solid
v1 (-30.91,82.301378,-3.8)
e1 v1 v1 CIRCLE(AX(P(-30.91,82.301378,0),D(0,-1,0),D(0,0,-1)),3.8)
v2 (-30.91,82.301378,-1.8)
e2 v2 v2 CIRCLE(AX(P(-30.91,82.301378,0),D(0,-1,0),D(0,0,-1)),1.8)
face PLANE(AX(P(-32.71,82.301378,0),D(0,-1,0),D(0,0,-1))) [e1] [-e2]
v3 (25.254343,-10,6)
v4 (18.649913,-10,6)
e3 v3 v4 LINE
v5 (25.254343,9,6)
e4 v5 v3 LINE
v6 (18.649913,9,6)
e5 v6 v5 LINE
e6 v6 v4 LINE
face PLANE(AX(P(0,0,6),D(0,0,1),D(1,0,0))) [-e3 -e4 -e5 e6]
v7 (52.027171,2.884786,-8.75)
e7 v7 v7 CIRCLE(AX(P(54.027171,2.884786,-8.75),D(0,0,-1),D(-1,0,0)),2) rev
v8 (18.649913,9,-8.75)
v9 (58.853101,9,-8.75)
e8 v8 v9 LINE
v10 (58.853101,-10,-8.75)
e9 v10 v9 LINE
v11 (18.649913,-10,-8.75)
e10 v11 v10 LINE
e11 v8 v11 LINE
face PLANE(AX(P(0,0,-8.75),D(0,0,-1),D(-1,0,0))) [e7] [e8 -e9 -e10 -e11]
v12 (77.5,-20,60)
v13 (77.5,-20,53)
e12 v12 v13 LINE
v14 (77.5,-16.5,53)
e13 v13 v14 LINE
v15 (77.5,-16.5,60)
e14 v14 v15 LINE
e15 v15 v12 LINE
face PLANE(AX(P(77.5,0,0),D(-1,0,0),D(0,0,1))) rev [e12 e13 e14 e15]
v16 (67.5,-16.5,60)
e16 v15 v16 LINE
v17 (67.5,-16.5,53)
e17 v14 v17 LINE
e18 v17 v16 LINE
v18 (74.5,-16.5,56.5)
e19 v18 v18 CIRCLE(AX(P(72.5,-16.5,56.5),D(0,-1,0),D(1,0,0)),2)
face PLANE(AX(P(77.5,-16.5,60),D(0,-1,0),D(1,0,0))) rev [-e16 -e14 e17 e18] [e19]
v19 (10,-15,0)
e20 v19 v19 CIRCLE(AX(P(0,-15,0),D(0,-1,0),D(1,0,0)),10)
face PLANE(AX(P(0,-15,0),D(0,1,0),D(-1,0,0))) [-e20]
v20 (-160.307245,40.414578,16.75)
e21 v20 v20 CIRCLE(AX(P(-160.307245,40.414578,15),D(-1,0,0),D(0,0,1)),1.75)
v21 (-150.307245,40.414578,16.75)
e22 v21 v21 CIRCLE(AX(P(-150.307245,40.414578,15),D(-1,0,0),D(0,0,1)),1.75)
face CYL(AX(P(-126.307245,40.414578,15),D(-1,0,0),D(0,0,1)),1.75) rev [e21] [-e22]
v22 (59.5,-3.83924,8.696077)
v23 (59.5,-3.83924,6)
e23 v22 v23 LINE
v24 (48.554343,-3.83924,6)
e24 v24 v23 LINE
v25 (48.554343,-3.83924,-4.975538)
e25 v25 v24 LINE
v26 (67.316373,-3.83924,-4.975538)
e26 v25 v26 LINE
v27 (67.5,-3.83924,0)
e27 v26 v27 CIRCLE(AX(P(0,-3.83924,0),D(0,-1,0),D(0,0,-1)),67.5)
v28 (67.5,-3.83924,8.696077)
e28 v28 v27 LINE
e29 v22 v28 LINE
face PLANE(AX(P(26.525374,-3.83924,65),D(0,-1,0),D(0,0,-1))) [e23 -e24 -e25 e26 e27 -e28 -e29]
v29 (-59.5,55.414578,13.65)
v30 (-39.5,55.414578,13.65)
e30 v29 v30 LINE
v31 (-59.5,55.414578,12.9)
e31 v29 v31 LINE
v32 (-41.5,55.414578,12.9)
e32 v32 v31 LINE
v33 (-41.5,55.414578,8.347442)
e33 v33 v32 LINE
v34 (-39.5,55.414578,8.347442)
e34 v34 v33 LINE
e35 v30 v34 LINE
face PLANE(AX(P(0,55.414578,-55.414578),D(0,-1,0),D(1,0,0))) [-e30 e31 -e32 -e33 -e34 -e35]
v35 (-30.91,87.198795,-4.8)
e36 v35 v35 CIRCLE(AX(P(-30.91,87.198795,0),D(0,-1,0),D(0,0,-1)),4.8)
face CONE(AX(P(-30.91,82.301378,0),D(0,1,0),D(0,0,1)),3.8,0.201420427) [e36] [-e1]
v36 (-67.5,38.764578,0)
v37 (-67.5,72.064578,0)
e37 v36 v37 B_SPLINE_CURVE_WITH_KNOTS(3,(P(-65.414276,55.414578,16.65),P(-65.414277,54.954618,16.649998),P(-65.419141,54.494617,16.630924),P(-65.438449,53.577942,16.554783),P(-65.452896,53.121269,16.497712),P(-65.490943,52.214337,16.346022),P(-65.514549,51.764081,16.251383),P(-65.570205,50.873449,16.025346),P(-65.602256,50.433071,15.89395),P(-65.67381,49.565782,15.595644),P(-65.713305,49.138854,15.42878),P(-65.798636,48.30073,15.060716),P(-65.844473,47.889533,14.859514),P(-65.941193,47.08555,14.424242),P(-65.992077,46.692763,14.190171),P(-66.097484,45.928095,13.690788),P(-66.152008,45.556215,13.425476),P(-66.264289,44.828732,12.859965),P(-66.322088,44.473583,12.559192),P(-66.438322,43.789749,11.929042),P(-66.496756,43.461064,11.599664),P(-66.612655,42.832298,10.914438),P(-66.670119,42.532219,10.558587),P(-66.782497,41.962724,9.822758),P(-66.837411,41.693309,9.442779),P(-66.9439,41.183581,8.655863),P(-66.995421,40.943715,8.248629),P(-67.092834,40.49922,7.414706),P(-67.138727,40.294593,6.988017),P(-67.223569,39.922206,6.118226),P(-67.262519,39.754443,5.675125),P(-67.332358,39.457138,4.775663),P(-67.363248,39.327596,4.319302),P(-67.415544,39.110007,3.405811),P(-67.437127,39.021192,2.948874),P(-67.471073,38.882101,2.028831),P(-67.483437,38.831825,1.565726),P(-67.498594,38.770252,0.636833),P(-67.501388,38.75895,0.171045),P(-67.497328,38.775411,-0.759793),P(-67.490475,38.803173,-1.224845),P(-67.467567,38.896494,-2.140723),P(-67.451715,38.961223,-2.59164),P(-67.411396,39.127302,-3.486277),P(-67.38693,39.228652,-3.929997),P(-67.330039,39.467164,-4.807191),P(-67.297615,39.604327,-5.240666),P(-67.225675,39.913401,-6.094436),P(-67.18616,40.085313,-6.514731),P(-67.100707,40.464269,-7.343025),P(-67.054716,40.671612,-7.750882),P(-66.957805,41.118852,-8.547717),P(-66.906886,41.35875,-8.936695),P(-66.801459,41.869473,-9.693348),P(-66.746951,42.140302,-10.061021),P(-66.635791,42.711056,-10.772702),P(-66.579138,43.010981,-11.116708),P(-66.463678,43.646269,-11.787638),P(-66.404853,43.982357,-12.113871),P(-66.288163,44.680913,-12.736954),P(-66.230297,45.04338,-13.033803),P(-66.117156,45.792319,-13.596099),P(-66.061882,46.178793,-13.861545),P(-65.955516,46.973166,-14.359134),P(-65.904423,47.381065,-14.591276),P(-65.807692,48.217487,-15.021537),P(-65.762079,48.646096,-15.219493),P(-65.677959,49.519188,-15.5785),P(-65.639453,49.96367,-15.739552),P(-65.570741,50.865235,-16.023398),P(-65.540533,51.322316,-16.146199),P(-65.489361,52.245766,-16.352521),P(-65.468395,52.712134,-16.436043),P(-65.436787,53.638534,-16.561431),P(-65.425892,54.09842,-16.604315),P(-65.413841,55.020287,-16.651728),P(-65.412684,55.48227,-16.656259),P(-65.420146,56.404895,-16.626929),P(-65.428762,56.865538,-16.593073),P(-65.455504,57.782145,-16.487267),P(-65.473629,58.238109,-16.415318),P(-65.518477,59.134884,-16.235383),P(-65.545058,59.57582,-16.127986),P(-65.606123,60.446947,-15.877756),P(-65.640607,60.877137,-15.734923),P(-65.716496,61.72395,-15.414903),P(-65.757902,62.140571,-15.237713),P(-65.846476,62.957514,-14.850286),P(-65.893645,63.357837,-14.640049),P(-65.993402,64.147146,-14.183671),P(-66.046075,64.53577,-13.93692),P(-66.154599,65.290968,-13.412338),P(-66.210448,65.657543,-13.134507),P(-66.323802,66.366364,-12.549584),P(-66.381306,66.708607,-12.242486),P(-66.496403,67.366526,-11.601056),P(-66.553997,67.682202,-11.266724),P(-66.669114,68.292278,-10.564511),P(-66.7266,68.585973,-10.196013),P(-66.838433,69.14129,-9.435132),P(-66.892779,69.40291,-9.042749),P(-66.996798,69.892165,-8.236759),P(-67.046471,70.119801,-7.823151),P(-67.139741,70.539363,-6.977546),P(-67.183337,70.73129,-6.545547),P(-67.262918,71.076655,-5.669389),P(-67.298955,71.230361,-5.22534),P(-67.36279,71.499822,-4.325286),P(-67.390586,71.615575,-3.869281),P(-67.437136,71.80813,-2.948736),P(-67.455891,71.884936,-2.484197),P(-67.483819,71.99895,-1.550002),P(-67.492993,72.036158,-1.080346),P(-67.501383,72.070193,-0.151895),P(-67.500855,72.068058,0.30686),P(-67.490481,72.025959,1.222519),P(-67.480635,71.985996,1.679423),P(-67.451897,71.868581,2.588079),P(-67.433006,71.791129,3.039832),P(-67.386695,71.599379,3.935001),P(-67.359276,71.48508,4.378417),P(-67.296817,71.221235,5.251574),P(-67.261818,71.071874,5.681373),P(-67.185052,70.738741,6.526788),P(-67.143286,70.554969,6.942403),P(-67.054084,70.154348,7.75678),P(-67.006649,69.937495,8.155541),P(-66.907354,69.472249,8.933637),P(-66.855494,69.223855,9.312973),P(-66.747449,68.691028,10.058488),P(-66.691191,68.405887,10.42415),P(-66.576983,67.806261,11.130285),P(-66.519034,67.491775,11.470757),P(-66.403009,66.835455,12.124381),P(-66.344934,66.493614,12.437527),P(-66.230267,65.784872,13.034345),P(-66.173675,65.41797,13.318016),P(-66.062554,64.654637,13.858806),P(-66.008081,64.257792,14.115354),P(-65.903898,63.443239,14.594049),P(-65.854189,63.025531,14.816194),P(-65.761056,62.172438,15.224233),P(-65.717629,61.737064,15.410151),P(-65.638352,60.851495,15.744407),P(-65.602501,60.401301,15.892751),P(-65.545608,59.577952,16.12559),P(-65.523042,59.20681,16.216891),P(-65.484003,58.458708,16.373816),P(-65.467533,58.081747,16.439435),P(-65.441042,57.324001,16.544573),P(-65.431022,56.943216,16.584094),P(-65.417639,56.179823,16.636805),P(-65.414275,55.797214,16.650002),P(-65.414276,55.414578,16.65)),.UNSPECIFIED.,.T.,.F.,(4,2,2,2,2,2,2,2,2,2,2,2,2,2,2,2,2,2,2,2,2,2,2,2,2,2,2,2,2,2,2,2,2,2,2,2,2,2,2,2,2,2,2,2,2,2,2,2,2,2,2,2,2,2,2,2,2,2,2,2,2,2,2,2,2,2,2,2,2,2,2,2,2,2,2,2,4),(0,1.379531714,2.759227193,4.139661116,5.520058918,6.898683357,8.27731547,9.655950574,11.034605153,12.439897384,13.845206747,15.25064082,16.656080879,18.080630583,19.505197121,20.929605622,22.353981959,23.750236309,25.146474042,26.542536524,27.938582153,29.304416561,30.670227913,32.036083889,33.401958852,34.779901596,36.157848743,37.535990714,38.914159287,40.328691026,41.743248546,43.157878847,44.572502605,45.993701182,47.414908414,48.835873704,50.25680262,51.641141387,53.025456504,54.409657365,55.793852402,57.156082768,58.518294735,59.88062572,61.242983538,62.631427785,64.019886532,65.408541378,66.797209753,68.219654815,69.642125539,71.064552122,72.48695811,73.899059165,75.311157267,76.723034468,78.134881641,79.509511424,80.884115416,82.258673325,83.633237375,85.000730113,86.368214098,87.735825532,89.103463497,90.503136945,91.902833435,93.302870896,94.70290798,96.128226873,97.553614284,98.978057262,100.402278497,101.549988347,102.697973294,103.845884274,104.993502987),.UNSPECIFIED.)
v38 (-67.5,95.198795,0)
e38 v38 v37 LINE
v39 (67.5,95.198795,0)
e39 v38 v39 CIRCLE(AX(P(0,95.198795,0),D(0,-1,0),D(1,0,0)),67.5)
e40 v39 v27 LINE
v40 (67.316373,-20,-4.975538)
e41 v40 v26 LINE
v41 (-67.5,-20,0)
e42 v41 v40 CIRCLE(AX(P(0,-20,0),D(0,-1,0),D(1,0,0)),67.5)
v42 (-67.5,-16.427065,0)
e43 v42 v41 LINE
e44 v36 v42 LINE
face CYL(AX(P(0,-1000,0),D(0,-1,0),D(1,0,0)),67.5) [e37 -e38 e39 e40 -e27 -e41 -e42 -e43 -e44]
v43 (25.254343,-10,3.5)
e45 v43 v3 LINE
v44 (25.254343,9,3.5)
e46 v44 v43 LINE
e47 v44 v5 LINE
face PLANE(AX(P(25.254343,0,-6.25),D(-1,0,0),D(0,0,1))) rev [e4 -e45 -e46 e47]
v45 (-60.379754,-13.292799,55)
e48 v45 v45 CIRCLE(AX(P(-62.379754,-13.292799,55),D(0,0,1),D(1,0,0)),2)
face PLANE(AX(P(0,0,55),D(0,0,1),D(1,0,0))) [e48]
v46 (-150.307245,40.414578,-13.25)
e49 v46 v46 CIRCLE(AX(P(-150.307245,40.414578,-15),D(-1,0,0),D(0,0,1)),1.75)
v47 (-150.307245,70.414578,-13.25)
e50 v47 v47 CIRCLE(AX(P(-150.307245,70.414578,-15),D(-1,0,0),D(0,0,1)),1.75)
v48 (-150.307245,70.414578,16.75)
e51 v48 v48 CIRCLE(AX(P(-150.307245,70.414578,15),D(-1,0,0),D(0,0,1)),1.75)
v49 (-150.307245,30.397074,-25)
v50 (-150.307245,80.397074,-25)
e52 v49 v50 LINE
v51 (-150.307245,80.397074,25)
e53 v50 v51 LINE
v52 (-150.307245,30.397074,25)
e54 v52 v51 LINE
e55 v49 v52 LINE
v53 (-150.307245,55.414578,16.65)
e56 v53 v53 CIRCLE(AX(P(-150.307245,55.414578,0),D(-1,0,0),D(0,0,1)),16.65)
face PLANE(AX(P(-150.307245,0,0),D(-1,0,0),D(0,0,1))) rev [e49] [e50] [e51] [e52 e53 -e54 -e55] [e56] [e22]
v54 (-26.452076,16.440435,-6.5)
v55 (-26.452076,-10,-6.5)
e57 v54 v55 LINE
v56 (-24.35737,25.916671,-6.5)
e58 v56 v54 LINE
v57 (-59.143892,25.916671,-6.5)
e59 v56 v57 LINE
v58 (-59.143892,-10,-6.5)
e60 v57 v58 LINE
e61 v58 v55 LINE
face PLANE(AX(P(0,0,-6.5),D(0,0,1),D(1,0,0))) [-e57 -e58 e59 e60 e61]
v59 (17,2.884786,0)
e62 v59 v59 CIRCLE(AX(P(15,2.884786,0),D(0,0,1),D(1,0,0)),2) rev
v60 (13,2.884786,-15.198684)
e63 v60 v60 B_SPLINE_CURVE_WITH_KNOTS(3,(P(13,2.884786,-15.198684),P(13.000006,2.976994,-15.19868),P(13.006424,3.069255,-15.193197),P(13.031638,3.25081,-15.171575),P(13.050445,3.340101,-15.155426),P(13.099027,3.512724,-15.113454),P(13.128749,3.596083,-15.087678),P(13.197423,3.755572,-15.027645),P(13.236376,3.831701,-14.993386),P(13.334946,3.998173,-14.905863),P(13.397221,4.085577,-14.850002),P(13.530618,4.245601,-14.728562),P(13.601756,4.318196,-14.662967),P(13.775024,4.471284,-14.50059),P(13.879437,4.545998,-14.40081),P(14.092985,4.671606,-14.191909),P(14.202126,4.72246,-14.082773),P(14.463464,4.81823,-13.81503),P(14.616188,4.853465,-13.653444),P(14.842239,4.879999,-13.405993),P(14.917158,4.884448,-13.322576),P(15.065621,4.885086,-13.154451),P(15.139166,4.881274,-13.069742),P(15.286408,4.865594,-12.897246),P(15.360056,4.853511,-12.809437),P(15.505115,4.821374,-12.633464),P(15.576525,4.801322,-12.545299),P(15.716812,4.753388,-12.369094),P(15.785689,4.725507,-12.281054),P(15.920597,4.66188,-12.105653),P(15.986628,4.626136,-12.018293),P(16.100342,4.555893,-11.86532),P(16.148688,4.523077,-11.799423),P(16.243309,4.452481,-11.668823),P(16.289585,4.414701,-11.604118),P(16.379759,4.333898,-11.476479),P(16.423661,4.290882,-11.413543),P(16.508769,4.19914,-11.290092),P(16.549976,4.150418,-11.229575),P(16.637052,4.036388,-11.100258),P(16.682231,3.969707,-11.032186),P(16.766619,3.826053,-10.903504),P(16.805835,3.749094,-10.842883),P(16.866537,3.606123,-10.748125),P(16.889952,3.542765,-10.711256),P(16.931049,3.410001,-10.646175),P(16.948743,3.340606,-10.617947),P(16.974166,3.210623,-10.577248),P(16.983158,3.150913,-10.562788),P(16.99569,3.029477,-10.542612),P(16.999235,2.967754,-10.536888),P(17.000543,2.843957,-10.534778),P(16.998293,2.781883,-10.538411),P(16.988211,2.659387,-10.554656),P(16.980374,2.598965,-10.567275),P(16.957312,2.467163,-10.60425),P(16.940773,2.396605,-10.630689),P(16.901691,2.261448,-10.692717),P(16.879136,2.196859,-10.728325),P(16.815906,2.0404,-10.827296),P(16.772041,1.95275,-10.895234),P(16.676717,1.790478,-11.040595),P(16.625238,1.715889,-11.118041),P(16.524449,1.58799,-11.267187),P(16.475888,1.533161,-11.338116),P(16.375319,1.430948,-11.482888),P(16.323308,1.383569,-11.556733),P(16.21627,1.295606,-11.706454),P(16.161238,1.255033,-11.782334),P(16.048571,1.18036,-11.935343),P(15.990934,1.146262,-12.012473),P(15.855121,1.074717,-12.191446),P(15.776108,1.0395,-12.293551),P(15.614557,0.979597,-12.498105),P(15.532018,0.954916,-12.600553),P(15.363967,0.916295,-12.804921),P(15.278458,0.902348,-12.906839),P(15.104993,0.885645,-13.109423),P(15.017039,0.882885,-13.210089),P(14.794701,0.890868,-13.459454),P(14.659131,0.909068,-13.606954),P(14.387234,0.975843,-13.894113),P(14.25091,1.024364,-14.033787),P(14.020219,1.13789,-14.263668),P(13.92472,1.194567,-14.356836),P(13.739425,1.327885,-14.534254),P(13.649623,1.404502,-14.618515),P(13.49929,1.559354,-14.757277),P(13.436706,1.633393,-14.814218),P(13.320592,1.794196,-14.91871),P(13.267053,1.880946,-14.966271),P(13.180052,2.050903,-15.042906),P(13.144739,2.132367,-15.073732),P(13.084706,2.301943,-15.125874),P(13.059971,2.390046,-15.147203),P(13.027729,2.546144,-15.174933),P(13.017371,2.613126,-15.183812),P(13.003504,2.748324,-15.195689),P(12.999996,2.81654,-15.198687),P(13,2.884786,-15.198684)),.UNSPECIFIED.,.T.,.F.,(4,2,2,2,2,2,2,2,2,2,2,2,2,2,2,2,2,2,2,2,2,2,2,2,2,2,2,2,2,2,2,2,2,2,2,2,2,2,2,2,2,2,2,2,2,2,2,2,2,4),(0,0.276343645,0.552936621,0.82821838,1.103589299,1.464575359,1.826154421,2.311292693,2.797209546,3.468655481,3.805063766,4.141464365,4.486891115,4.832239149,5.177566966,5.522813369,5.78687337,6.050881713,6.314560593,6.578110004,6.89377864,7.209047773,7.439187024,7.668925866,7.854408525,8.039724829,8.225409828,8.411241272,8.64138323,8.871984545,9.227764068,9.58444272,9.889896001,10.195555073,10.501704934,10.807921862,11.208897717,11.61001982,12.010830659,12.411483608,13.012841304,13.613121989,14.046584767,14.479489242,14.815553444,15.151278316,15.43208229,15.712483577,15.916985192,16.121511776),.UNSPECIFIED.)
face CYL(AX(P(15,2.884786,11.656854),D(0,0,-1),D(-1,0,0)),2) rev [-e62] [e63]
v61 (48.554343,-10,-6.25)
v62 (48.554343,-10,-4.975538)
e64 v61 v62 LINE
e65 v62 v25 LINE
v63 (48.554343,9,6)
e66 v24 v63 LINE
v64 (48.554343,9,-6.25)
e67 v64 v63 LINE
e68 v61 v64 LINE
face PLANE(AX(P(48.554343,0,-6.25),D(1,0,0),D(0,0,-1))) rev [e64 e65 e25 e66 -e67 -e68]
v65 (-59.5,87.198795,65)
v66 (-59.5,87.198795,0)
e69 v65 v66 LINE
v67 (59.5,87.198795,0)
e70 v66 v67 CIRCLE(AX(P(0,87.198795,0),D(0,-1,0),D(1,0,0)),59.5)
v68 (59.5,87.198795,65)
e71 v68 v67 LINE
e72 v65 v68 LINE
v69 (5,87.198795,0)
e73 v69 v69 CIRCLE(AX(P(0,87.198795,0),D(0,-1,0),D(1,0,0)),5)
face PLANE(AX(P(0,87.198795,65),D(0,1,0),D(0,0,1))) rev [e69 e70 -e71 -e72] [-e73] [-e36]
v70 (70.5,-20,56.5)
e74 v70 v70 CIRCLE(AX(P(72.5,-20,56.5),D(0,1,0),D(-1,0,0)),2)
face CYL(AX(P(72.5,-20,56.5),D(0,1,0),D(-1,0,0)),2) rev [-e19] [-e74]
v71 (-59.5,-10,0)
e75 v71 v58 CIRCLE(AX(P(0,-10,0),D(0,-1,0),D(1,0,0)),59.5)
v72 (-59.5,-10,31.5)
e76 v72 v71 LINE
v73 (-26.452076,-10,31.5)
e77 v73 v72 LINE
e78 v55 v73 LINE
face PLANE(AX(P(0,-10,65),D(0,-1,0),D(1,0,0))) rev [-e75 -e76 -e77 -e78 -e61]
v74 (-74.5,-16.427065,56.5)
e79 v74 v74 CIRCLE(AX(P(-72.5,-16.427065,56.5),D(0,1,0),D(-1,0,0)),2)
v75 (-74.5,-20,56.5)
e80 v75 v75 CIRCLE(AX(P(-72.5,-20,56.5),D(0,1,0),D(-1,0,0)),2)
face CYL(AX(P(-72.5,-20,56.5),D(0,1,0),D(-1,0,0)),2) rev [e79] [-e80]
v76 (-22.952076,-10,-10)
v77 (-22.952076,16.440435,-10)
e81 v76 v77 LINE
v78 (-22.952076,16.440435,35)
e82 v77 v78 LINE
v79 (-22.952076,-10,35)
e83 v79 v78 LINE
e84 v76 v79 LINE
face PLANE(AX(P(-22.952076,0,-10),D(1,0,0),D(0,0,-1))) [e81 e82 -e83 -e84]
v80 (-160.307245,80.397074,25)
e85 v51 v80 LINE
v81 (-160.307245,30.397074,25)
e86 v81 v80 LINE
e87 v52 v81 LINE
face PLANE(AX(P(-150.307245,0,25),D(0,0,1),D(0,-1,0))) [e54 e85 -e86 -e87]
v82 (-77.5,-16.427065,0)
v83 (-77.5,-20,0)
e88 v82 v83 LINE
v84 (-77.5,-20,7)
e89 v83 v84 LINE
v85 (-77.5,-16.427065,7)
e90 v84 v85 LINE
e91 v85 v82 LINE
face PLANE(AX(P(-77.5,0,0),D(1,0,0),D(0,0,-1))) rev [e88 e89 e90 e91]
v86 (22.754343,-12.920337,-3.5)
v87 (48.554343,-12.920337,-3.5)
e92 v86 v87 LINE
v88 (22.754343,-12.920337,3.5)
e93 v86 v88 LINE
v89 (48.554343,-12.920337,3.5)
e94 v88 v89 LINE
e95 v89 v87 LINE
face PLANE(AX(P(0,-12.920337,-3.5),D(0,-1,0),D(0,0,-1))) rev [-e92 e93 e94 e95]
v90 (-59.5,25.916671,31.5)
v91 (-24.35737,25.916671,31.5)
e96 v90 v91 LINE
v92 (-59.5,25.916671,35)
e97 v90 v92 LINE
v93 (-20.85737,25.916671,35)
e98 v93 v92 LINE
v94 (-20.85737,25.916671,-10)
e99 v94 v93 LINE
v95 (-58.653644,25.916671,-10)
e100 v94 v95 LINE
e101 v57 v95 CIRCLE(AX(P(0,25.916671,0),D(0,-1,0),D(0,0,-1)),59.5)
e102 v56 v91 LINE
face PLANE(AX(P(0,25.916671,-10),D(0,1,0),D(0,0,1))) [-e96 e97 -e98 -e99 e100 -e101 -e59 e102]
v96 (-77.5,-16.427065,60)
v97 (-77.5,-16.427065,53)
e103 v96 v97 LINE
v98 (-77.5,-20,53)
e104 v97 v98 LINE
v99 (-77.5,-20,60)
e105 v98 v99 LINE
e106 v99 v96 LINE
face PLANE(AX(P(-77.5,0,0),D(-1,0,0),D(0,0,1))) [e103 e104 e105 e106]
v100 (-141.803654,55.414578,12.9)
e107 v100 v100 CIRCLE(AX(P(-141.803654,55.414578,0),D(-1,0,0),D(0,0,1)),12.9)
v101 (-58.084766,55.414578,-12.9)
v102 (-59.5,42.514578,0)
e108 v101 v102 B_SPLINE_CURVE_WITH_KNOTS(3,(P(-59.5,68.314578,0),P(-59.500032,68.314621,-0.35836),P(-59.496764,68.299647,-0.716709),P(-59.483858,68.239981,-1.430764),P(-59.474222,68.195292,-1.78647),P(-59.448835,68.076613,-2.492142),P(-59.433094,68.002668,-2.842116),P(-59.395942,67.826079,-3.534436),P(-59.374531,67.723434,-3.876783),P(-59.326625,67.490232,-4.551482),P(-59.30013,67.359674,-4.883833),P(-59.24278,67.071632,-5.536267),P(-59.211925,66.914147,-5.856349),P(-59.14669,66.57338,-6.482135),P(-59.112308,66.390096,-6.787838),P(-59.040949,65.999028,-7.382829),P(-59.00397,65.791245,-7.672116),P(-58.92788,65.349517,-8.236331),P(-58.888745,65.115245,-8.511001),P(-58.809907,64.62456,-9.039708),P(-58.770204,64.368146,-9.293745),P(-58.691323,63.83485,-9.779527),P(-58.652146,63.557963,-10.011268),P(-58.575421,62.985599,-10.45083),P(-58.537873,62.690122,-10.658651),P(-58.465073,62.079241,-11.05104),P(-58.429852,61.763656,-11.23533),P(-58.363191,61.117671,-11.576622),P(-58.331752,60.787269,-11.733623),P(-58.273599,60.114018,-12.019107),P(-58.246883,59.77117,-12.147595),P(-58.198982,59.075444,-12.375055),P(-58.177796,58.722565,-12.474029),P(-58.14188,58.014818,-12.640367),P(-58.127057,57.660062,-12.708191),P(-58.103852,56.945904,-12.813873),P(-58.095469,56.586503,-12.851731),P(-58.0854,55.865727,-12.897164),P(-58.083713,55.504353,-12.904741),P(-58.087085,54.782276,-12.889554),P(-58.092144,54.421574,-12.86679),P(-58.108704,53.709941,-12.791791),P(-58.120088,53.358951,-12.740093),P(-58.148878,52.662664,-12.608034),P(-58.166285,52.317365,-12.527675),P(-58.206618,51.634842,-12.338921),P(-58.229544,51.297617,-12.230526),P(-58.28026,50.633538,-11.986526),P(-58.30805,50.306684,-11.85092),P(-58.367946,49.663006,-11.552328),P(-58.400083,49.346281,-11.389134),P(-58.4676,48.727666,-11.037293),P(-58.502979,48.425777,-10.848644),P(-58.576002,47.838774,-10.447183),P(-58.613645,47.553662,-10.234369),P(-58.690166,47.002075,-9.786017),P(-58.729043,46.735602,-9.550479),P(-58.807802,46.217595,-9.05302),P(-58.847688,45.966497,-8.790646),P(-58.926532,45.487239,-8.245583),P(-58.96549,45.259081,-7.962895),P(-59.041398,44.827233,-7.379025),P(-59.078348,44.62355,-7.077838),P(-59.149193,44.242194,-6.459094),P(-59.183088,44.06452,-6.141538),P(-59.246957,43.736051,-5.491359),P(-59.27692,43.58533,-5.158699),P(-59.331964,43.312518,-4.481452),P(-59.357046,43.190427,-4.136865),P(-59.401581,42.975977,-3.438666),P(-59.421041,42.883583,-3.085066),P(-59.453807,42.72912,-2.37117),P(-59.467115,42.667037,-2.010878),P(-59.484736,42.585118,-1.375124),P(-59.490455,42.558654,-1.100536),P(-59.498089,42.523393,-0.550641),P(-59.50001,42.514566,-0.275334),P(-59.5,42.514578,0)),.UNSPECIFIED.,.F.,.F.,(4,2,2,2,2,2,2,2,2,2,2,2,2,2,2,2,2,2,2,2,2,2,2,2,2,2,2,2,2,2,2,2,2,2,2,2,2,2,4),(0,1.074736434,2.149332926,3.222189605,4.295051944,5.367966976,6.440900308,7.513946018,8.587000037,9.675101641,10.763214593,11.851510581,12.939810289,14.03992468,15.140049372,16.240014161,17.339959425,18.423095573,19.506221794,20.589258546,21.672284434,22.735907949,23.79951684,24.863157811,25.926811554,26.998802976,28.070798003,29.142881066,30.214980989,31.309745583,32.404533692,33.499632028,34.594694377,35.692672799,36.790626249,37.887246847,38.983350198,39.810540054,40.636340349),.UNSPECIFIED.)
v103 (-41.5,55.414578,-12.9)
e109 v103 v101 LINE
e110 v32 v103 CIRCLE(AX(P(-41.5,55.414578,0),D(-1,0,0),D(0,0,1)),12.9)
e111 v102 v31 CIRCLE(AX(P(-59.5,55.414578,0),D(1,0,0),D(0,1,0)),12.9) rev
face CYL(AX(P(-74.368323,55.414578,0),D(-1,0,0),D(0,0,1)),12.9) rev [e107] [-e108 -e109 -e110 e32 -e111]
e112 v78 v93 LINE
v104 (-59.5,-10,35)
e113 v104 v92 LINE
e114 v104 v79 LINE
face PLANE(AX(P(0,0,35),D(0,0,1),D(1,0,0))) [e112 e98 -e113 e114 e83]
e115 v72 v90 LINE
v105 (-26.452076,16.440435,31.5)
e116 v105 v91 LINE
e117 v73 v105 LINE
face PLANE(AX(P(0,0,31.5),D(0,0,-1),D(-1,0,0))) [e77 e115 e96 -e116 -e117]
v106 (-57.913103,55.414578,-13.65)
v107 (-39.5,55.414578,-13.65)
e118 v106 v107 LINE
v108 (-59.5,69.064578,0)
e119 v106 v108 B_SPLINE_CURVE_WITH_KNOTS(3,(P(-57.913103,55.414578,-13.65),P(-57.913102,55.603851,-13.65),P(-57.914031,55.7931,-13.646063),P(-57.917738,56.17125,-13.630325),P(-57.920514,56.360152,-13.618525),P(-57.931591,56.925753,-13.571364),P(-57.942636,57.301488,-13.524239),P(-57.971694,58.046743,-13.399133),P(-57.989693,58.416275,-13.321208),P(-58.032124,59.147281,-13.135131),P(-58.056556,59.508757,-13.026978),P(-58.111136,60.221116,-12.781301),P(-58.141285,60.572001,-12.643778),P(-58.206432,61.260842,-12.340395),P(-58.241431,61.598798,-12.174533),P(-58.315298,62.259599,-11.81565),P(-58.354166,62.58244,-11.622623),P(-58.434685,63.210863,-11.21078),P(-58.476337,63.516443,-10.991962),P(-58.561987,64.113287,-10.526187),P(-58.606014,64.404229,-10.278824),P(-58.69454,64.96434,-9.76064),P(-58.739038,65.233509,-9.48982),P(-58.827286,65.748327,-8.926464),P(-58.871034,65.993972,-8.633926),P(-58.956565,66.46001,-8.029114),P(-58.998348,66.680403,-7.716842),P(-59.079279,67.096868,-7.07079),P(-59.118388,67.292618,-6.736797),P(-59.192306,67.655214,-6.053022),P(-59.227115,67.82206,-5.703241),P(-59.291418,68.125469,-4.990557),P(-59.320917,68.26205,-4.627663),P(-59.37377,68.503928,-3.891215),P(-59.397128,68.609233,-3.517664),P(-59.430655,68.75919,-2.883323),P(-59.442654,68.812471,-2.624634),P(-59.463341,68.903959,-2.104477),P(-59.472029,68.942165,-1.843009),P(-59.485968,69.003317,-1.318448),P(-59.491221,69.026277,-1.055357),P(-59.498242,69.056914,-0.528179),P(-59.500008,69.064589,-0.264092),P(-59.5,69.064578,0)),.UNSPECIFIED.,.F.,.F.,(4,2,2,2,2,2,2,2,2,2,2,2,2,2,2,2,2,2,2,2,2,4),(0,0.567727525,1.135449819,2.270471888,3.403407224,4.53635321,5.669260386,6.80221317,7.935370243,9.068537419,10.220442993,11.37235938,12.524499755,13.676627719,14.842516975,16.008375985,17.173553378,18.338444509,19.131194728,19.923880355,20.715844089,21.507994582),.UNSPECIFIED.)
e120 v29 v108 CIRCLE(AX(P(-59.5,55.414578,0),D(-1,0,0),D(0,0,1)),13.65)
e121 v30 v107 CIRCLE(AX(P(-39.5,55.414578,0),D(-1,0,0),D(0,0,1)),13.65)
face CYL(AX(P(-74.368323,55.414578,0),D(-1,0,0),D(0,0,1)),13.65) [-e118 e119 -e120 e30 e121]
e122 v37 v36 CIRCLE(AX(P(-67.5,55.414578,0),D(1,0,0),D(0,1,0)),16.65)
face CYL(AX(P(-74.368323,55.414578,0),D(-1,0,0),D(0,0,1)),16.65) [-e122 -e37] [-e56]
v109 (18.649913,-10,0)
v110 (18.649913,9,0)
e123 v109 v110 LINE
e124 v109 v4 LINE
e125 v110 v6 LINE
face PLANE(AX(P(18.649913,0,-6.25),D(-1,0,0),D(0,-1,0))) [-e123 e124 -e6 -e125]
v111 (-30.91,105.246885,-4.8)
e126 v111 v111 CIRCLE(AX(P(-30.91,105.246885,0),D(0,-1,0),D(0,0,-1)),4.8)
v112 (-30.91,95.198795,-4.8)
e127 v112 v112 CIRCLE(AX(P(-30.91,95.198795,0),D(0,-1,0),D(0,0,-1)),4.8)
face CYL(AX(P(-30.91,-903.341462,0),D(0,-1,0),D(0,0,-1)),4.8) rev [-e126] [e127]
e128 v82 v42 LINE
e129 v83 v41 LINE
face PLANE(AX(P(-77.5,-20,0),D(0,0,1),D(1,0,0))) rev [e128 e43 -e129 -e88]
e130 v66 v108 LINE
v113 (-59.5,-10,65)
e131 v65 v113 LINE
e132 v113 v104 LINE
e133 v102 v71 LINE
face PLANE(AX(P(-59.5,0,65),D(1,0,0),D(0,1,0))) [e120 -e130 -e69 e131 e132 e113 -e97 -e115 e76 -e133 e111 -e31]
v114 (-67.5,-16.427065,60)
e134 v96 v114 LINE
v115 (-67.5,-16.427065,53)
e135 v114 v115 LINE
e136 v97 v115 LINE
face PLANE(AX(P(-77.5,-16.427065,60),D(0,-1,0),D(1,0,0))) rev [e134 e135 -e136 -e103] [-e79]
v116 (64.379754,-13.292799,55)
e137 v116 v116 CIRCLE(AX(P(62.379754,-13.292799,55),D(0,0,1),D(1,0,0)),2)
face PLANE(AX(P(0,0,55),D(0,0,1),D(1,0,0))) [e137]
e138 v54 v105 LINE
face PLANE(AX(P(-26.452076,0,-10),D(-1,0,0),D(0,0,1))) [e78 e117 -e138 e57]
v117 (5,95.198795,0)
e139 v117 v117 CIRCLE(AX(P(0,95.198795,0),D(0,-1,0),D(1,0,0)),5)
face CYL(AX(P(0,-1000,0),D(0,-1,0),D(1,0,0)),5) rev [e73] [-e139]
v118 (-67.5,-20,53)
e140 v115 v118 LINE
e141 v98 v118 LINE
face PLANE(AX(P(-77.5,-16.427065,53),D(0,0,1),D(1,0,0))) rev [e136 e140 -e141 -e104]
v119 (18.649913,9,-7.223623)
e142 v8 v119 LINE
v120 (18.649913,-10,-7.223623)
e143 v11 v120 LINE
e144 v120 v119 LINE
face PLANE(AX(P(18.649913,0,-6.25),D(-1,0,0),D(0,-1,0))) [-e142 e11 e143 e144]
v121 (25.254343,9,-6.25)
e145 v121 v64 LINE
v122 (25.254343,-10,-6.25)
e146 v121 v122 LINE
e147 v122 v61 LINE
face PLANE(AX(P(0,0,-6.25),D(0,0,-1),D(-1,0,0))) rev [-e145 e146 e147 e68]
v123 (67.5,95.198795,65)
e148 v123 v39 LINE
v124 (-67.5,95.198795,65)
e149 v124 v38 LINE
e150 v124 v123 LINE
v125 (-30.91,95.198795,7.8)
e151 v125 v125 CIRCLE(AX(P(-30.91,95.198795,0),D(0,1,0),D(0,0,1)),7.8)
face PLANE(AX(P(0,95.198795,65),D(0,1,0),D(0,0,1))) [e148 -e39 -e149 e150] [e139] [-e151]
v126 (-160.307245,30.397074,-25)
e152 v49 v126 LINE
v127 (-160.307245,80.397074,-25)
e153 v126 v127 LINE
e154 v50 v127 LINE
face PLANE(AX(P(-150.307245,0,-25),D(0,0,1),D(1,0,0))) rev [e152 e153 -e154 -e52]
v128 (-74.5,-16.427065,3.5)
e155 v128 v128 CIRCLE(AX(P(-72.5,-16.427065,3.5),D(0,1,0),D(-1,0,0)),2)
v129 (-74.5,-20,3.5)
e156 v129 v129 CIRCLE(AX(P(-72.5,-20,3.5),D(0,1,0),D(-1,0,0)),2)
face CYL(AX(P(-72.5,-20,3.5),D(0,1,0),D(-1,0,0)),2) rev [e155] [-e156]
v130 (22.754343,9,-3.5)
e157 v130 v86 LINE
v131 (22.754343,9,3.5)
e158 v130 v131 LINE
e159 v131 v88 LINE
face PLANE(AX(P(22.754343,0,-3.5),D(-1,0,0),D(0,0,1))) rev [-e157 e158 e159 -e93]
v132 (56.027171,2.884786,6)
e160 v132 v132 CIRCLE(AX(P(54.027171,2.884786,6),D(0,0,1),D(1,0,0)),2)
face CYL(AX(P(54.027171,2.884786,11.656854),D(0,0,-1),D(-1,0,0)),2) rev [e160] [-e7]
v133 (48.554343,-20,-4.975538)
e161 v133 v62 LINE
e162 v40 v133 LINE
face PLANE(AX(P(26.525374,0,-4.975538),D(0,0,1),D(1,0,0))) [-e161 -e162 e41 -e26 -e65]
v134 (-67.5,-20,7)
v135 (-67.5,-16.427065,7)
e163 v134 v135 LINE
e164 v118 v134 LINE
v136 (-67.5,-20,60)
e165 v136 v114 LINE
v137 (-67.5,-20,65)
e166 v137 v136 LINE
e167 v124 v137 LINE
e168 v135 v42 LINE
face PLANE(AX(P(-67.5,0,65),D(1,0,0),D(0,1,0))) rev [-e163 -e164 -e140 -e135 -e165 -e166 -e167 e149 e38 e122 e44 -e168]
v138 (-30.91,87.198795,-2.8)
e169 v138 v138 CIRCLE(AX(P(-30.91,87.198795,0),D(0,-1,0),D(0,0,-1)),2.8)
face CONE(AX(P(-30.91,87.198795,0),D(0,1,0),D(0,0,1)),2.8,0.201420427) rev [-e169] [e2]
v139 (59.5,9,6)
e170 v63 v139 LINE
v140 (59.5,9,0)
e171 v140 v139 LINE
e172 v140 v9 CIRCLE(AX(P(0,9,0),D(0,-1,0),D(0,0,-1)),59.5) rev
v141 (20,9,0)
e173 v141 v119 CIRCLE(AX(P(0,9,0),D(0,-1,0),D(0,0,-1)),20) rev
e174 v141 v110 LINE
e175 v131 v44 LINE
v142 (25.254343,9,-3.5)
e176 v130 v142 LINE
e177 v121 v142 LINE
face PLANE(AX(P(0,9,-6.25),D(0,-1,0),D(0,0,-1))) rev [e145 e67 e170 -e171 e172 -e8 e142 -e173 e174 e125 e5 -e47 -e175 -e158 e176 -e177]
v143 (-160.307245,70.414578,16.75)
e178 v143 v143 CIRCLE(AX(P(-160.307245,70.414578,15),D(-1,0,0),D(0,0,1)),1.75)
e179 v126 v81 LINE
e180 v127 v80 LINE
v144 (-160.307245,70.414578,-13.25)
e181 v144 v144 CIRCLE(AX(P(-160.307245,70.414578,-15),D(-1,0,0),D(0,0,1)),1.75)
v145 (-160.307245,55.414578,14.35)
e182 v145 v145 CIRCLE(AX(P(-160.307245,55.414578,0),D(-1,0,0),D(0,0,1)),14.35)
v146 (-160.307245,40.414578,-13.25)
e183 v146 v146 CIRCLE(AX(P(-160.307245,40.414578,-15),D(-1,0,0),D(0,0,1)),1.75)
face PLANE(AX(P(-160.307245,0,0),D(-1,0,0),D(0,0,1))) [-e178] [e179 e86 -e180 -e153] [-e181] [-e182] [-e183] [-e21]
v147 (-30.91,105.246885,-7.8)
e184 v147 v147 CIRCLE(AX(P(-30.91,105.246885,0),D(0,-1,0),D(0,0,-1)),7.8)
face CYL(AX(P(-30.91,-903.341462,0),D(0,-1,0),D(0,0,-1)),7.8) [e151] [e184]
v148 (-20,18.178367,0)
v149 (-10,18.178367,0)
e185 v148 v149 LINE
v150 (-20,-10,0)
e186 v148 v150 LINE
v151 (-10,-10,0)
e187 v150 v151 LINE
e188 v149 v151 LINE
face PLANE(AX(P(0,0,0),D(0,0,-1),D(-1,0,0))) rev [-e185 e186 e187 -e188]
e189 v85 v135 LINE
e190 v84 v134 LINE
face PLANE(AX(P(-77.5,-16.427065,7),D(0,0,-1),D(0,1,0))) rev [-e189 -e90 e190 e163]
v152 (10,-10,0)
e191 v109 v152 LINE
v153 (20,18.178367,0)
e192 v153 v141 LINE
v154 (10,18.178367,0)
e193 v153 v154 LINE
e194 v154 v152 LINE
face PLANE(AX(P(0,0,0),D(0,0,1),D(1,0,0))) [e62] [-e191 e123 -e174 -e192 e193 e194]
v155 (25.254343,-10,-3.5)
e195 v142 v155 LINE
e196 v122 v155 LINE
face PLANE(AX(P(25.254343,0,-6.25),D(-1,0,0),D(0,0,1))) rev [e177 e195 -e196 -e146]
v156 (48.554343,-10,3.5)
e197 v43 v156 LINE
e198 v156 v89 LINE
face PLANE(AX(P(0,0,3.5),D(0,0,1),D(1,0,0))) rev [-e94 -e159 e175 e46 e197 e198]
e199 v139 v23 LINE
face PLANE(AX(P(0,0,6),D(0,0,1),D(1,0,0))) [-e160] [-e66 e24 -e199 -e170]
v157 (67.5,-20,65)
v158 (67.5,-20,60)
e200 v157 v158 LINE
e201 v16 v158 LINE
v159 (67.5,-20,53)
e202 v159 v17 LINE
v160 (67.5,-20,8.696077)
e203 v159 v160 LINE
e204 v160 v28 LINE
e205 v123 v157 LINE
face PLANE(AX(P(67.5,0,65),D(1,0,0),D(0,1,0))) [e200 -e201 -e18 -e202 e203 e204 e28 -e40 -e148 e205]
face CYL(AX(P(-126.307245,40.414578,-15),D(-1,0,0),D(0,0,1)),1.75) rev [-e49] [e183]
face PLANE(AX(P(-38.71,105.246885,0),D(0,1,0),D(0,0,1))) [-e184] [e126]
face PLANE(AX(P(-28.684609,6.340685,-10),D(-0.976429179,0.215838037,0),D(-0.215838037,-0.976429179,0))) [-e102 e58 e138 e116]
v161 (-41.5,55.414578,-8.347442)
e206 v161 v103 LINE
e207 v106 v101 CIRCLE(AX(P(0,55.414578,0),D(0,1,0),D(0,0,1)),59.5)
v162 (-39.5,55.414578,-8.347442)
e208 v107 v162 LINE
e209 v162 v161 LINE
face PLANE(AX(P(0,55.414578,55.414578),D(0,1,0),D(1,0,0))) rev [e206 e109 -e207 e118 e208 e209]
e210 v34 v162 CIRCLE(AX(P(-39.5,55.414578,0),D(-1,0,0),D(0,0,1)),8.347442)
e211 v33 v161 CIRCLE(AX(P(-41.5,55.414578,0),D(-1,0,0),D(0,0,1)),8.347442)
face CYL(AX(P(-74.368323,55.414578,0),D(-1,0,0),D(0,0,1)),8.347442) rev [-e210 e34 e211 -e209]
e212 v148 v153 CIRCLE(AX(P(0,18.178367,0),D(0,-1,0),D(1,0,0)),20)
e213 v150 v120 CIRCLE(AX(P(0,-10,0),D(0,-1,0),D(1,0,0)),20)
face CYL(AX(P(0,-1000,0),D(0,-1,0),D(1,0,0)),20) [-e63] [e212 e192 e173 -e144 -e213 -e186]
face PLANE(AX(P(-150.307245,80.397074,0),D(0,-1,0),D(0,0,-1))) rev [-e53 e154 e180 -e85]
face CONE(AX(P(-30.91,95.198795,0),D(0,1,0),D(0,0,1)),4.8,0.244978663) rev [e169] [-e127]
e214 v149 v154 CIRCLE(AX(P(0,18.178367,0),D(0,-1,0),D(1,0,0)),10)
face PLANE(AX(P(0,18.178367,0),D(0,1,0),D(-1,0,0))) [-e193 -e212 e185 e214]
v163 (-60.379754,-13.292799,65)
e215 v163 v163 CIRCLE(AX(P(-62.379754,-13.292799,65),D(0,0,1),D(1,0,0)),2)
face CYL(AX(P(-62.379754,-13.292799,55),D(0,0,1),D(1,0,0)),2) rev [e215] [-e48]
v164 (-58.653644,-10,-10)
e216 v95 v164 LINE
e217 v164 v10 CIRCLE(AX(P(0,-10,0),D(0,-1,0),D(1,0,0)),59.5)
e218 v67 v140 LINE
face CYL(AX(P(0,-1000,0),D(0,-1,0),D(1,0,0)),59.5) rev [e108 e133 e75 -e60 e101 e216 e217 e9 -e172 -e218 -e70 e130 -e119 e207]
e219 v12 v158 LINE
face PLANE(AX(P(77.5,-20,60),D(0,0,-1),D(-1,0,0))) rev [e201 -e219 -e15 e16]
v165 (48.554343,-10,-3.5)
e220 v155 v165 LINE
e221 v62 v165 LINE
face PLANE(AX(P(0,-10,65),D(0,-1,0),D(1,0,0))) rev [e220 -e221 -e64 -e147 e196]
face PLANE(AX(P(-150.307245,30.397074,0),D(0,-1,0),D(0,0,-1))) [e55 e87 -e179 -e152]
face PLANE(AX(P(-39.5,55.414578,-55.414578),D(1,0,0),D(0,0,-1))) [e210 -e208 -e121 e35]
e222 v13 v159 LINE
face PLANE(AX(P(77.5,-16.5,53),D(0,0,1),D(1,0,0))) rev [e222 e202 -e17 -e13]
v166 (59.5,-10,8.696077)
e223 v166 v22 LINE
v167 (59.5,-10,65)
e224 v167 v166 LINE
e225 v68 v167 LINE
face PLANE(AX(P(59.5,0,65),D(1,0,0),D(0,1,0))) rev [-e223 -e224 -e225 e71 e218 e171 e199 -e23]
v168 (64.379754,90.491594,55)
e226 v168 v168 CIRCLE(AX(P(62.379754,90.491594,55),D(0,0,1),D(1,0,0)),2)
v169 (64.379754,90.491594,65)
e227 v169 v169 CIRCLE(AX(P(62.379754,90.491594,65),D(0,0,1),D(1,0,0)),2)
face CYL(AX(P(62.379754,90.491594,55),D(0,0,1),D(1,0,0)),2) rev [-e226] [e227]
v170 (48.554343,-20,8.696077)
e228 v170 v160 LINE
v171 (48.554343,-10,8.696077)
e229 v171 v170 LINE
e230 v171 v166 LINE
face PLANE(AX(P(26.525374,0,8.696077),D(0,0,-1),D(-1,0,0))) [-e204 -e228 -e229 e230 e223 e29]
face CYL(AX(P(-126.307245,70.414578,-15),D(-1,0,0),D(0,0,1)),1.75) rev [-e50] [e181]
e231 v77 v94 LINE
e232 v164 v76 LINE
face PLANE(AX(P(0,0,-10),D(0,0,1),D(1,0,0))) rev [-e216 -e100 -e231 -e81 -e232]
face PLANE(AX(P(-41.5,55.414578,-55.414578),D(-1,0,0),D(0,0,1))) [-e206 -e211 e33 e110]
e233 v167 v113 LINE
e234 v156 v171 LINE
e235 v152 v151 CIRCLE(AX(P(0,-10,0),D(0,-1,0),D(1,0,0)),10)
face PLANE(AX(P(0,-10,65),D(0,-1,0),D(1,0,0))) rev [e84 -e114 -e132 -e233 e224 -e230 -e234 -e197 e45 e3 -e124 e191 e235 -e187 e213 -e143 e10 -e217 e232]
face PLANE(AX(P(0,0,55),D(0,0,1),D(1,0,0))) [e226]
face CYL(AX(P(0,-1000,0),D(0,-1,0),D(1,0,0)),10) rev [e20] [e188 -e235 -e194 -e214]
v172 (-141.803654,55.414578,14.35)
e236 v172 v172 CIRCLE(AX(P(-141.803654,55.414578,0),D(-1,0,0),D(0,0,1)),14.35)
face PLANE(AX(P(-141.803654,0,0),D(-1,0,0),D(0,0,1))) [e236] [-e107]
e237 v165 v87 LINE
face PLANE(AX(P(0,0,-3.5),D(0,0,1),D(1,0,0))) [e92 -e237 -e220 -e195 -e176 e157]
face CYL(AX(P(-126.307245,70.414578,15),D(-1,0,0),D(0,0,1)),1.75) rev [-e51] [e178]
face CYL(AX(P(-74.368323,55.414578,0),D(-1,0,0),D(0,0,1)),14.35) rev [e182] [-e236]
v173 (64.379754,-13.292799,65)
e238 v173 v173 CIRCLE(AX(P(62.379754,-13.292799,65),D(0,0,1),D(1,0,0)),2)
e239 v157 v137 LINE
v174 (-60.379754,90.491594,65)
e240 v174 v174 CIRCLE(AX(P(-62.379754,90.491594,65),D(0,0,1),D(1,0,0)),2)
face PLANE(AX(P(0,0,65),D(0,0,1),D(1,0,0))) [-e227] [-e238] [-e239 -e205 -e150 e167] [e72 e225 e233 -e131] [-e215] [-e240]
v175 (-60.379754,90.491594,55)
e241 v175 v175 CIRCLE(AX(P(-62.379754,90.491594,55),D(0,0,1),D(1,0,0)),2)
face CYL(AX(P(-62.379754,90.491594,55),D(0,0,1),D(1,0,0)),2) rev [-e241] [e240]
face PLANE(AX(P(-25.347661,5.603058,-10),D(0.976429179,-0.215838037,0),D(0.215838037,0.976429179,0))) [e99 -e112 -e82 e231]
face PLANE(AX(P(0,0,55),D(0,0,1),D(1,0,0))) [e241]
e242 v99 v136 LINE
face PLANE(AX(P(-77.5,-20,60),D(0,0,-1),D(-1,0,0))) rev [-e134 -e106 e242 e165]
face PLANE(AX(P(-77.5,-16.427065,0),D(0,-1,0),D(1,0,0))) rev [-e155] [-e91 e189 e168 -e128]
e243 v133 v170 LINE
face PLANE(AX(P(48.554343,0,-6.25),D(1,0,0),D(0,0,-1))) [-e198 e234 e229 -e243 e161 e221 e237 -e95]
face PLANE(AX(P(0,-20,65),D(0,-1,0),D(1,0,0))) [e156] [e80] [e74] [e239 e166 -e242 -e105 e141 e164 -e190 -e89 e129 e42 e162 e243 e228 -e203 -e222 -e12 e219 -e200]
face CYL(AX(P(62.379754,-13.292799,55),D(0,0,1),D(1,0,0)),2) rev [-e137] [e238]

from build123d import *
from build123d.topology import SkipClean

# Parameters (mm, degrees)
BOSS_EXTRUDE3_DEPTH                   = 65
BOSS_EXTRUDE1_DEPTH                   = 6
BOSS_EXTRUDE1_DEPTH_BACK              = 6.25
SKETCH1_5_W                           = 6.6044296
SKETCH1_5_H                           = 19
SKETCH1_5_W_2                         = 10.945657065
BOSS_EXTRUDE2_START                   = -8.75
BOSS_EXTRUDE2_OUTLINE_W               = 40.850086665
BOSS_EXTRUDE2_OUTLINE_H               = 19
BOSS_EXTRUDE2_DEPTH                   = 2.5
REVOLVE2_ANGLE                        = 180
SKETCH1_12_W                          = 10
SKETCH1_12_H                          = 5
SKETCH1_11_W                          = 5
SKETCH1_11_H                          = 8
REVOLVE4_START                        = -10
REVOLVE4_DEPTH                        = 28.178366994
SKETCH3_6_W                           = 74.303654242
SKETCH3_6_H                           = 3.75
REVOLVE7_ANGLE                        = 180
SKETCH3_8_W                           = 18.503590934
SKETCH3_8_H                           = 2.3
SKETCH5_W                             = 50
SKETCH5_H                             = 50
SKETCH5_R                             = 16.65
BOSS_EXTRUDE4_DEPTH                   = 10
SKETCH6_R                             = 1.75
CAMERA_HEAT_SET_INSERT_CUT_DEPTH      = 34
SERVO_START                           = 67.5
SKETCH9_W                             = 13.671614749
SKETCH9_H                             = 17.273170498
SERVO_WIRE_CUT_DEPTH                  = 18.945657065
CUT_EXTRUDE2_DEPTH                    = 3.5
SKETCH10_4_W                          = 3
SKETCH10_4_H                          = 10.048090033
BOSS_EXTRUDE5_DEPTH                   = 35
BOSS_EXTRUDE5_DEPTH_BACK              = 10
BOSS_EXTRUDE6_START                   = 31.5
SKETCH11_3_W                          = 3.5
SKETCH11_3_H                          = 26.440435159
SKETCH11_3_W_2                        = 33.047923562
BOSS_EXTRUDE6_DEPTH                   = 3.5
BOSS_EXTRUDE7_START                   = -10
SKETCH11_5_W                          = 33.047923562
SKETCH11_5_H                          = 26.440435159
BOSS_EXTRUDE7_DEPTH                   = 3.5
SKETCH12_R                            = 2
HEAT_SET_INSERT_CUT_DEPTH             = 17
HEAT_SET_INSERT_CUT_DIRECTION_2_REACH = 205.302
SKETCH14_R                            = 2
PANEL_HEAT_SET_INSERT_CUT_DEPTH       = 10
SKETCH16_W                            = 7
SKETCH16_H                            = 3.57293467
BOSS_EXTRUDE10_DEPTH                  = 10
SKETCH18_W                            = 7
SKETCH18_H                            = 3.5
BOSS_EXTRUDE11_DEPTH                  = 10
SKETCH19_R                            = 2
CUT_EXTRUDE1_DEPTH                    = 213.271554907


# Read off the part's stored shape, not the designer's step: Boss-Extrude2, Revolve4
with BuildPart() as part:
    # Sketch4 → Boss-Extrude3 (new body)
    with BuildSketch(Plane.XY):
        Polygon((59.5, -10), (0, -10), (0, -15), (0, -20), (67.5, -20), (67.5, 95.198794821), (0, 95.198794821), (0, 87.198794821), (59.5, 87.198794821), align=None)
    boss_extrude3 = extrude(amount=BOSS_EXTRUDE3_DEPTH)

    # Mirror1: Boss-Extrude3 across plane
    add(boss_extrude3.mirror(Plane(origin=(0, 0, 0), x_dir=(0, 0, 1), z_dir=(1, 0, 0))))

    # Sketch1<5> → Boss-Extrude1 (add, two sides: drawn at the far end of the back side and taken through both)
    with BuildSketch(Plane.XY.offset(-BOSS_EXTRUDE1_DEPTH_BACK)):
        with Locations((21.952128135, -0.5)):
            Rectangle(SKETCH1_5_W, SKETCH1_5_H)
        with Locations((54.027171468, -0.5)):
            Rectangle(SKETCH1_5_W_2, SKETCH1_5_H)
    extrude(amount=BOSS_EXTRUDE1_DEPTH + BOSS_EXTRUDE1_DEPTH_BACK)

    # Boss-Extrude2 outline → Boss-Extrude2 (add)
    with BuildSketch(Plane.XY.offset(BOSS_EXTRUDE2_START)):
        with Locations((39.074956668, -0.5)):
            Rectangle(BOSS_EXTRUDE2_OUTLINE_W, BOSS_EXTRUDE2_OUTLINE_H)
    extrude(amount=BOSS_EXTRUDE2_DEPTH)

    # Sketch1 → Revolve2 (revolve)
    with BuildSketch(Plane.XY):
        Polygon((0, -15), (0, -20), (67.5, -20), (67.5, 95.198794821), (5, 95.198794821), (5, 87.198794821), (59.5, 87.198794821), (59.5, -10), (0, -10), align=None)
    revolve(axis=Axis((0, -1000, 0), (0, 1, 0)), revolution_arc=REVOLVE2_ANGLE)

    # Sketch1<12> → Cut-Revolve4 (revolve, cut)
    with BuildSketch(Plane.XY):
        with Locations((5, -12.5)):
            Rectangle(SKETCH1_12_W, SKETCH1_12_H)
    revolve(axis=Axis((0, -1000, 0), (0, 1, 0)), mode=Mode.SUBTRACT)

    # Sketch1<11> → Cut-Revolve2 (revolve, cut)
    with SkipClean():  # the faces are left unmerged after this step: merging them gives an invalid solid
        with BuildSketch(Plane.XY):
            with Locations((2.5, 91.198794821)):
                Rectangle(SKETCH1_11_W, SKETCH1_11_H)
        revolve(axis=Axis((0, -1000, 0), (0, 1, 0)), mode=Mode.SUBTRACT)

    # Revolve4 outline → Revolve4 (add)
    with SkipClean():  # the faces are left unmerged after this step: merging them gives an invalid solid
        with BuildSketch(Plane(origin=(0, 0, 0), x_dir=(1, 0, 0), z_dir=(0, 1, 0)).offset(REVOLVE4_START)):
            with BuildLine():
                ThreePointArc((-10, 0), (0, 10), (10, 0))
                Line((10, 0), (20, 0))
                ThreePointArc((20, 0), (0, 20), (-20, 0))
                Line((-20, 0), (-10, 0))
            make_face()
        extrude(amount=REVOLVE4_DEPTH)

    # Sketch3 → Cut-Revolve1 (revolve, cut)
    with SkipClean():  # the faces are left unmerged after this step: merging them gives an invalid solid
        with BuildSketch(Plane.XY):
            Polygon((-49.874960718, 68.314577929), (-59.5, 68.314577929), (-67.5, 68.314577929), (-83.969434571, 68.314577929), (-83.969434571, 55.414577929), (-74.368322949, 55.414577929), (-58.243601064, 55.414577929), (-49.874960718, 55.414577929), align=None)
        revolve(axis=Axis((-74.368322949, 55.414577929, 0), (1, 0, 0)), mode=Mode.SUBTRACT)

    # Sketch3<6> → Revolve6 (revolve)
    with SkipClean():  # the faces are left unmerged after this step: merging them gives an invalid solid
        with BuildSketch(Plane.XY, mode=Mode.PRIVATE) as revolve6_sk:
            with Locations((-104.651827121, 70.189577929)):
                Rectangle(SKETCH3_6_W, SKETCH3_6_H)
            Polygon((-59.5, 69.064577929), (-59.5, 68.314577929), (-67.5, 68.314577929), (-67.5, 72.064577929), (-59.5, 72.064577929), align=None)
        revolve(revolve6_sk.sketch.rotate(Axis((-74.368322949, 55.414577929, 0), (1, 0, 0)), 90), axis=Axis((-74.368322949, 55.414577929, 0), (1, 0, 0)))

    # Sketch3<7> → Revolve7 (revolve, symmetric)
    with SkipClean():  # the faces are left unmerged after this step: merging them gives an invalid solid
        with BuildSketch(Plane.XY) as revolve7_sk:
            Polygon((-39.5, 69.064577929), (-59.5, 69.064577929), (-59.5, 68.314577929), (-49.874960718, 68.314577929), (-41.5, 68.314577929), (-41.5, 63.762019978), (-39.5, 63.762019978), align=None)
        revolve(axis=Axis((-74.368322949, 55.414577929, 0), (1, 0, 0)), revolution_arc=REVOLVE7_ANGLE / 2)
        revolve(revolve7_sk.sketch, axis=Axis((-74.368322949, 55.414577929, 0), (-1, 0, 0)), revolution_arc=REVOLVE7_ANGLE / 2)

    # Sketch3<8> → Revolve8 (revolve)
    with SkipClean():  # the faces are left unmerged after this step: merging them gives an invalid solid
        with BuildSketch(Plane.XY, mode=Mode.PRIVATE) as revolve8_sk:
            with Locations((-151.055449709, 70.914577929)):
                Rectangle(SKETCH3_8_W, SKETCH3_8_H)
        revolve(revolve8_sk.sketch.rotate(Axis((-74.368322949, 55.414577929, 0), (1, 0, 0)), 90), axis=Axis((-74.368322949, 55.414577929, 0), (1, 0, 0)))

    # Sketch5 → Boss-Extrude4 (add)
    with SkipClean():  # the faces are left unmerged after this step: merging them gives an invalid solid
        with BuildSketch(Plane.ZY.offset(160.307245176)):
            with Locations((0, 55.39707409)):
                Rectangle(SKETCH5_W, SKETCH5_H)
            with Locations((0, 55.414577929)):
                Circle(SKETCH5_R, mode=Mode.SUBTRACT)
        extrude(amount=-BOSS_EXTRUDE4_DEPTH)

    # Sketch6 → Camera Heat Set Insert Cut (cut)
    with SkipClean():  # the faces are left unmerged after this step: merging them gives an invalid solid
        with BuildSketch(Plane.ZY.offset(160.307245176)):
            with Locations((15, 70.414577929)):
                Circle(SKETCH6_R)
            with Locations((-15, 70.414577929)):
                Circle(SKETCH6_R)
            with Locations((-15, 40.414577929)):
                Circle(SKETCH6_R)
            with Locations((15, 40.414577929)):
                Circle(SKETCH6_R)
        extrude(amount=-CAMERA_HEAT_SET_INSERT_CUT_DEPTH, mode=Mode.SUBTRACT)

    # Sketch9 → Servo Wire Cut (cut)
    with BuildSketch(Plane(origin=(0, 0, 0), x_dir=(0, 0, -1), z_dir=(1, 0, 0)).offset(SERVO_START)):
        with Locations((-1.860269854, -12.475825554)):
            Rectangle(SKETCH9_W, SKETCH9_H)
    extrude(amount=-SERVO_WIRE_CUT_DEPTH, mode=Mode.SUBTRACT)

    # Sketch1<13> → Cut-Extrude2 (cut, symmetric)
    with BuildSketch(Plane.XY):
        Polygon((22.754342935, -12.920336749), (59.5, -12.920336749), (59.5, -10), (25.254342935, -10), (25.254342935, 9), (22.754342935, 9), align=None)
    extrude(amount=CUT_EXTRUDE2_DEPTH, both=True, mode=Mode.SUBTRACT)

    # Sketch10 → Cut-Revolve3 (revolve, cut)
    with BuildSketch(Plane(origin=(0, 0, 0), x_dir=(-1, 0, 0), z_dir=(0, 0, -1)), mode=Mode.PRIVATE) as cut_revolve3_sk:
        Polygon((30.91, 95.198794821), (35.71, 95.198794821), (33.71, 87.198794821), (30.91, 87.198794821), align=None)
        Polygon((30.91, 87.198794821), (30.91, 95.198794821), (35.71, 95.198794821), (33.71, 87.198794821), align=None)
    revolve(cut_revolve3_sk.sketch.rotate(Axis((-30.91, -903.341461843, 0), (0, 1, 0)), 270), axis=Axis((-30.91, -903.341461843, 0), (0, 1, 0)), mode=Mode.SUBTRACT)

    # Sketch10<4> → Tubing insert New (revolve)
    with SkipClean():  # the faces are left unmerged after this step: merging them gives an invalid solid
        with BuildSketch(Plane(origin=(0, 0, 0), x_dir=(-1, 0, 0), z_dir=(0, 0, -1)), mode=Mode.PRIVATE) as tubing_insert_new_sk:
            with Locations((37.21, 100.222839838)):
                Rectangle(SKETCH10_4_W, SKETCH10_4_H)
            Polygon((33.71, 87.198794821), (32.71, 82.301377514), (34.71, 82.301377514), (35.71, 87.198794821), align=None)
        revolve(tubing_insert_new_sk.sketch.rotate(Axis((-30.91, -903.341461843, 0), (0, 1, 0)), 270), axis=Axis((-30.91, -903.341461843, 0), (0, 1, 0)))
    add(part.part.scale(1), mode=Mode.REPLACE)  # the faces are merged on a copy

    # Sketch11 → Boss-Extrude5 (add, two sides: drawn at the far end of the back side and taken through both)
    with BuildSketch(Plane.XY.offset(-BOSS_EXTRUDE5_DEPTH_BACK)):
        Polygon((-24.357370462, 25.916670518), (-26.452076438, 16.440435159), (-26.452076438, -10), (-22.952076438, -10), (-22.952076438, 16.440435159), (-20.857370462, 25.916670518), align=None)
    extrude(amount=BOSS_EXTRUDE5_DEPTH + BOSS_EXTRUDE5_DEPTH_BACK)

    # Sketch11<3> → Boss-Extrude6 (add)
    with BuildSketch(Plane.XY.offset(BOSS_EXTRUDE6_START)):
        Polygon((-26.452076438, 16.440435159), (-22.952076438, 16.440435159), (-20.857370462, 25.916670518), (-24.357370462, 25.916670518), align=None)
        with Locations((-24.702076438, 3.220217579)):
            Rectangle(SKETCH11_3_W, SKETCH11_3_H)
        Polygon((-59.5, 16.440435159), (-26.452076438, 16.440435159), (-24.357370462, 25.916670518), (-59.5, 25.916670518), align=None)
        with Locations((-42.976038219, 3.220217579)):
            Rectangle(SKETCH11_3_W_2, SKETCH11_3_H)
    extrude(amount=BOSS_EXTRUDE6_DEPTH)

    # Sketch11<5> → Boss-Extrude7 (add)
    with SkipClean():  # the faces are left unmerged after this step: merging them gives an invalid solid
        with BuildSketch(Plane.XY.offset(BOSS_EXTRUDE7_START)):
            with Locations((-42.976038219, 3.220217579)):
                Rectangle(SKETCH11_5_W, SKETCH11_5_H)
            Polygon((-59.5, 16.440435159), (-26.452076438, 16.440435159), (-24.357370462, 25.916670518), (-59.5, 25.916670518), align=None)
        extrude(amount=BOSS_EXTRUDE7_DEPTH)

    # Sketch12 → Heat Set Insert Cut (cut)
    with SkipClean():  # the faces are left unmerged after this step: merging them gives an invalid solid
        with BuildSketch(Plane.XY):
            with Locations(Location((54.027171468, 2.884785525, 0), (0, 0, 180))):
                Circle(SKETCH12_R)
            with Locations(Location((15, 2.884785525, 0), (0, 0, 180))):
                Circle(SKETCH12_R)
        extrude(amount=-HEAT_SET_INSERT_CUT_DEPTH, mode=Mode.SUBTRACT)

    # Heat Set Insert Cut direction 2: up to this face of the body (flat: up to its plane)
    heat_set_insert_cut_direction_2_end = Plane(part.part.faces().sort_by_distance((54.027171468, 2.580379847, 6))[0])
    # Sketch12 → Heat Set Insert Cut direction 2 (cut, up to the picked face)
    with BuildSketch(Plane.XY, mode=Mode.PRIVATE) as heat_set_insert_cut_direction_2_sk1:
        with Locations(Location((54.027171468, 2.884785525, 0), (0, 0, 180))):
            Circle(SKETCH12_R)
    heat_set_insert_cut_direction_2_tool1 = split(extrude(heat_set_insert_cut_direction_2_sk1.sketch, amount=HEAT_SET_INSERT_CUT_DIRECTION_2_REACH, mode=Mode.PRIVATE), bisect_by=heat_set_insert_cut_direction_2_end, keep=Keep.BOTH, mode=Mode.PRIVATE)
    # Sketch12 → Heat Set Insert Cut direction 2 (cut, up to the picked face)
    with BuildSketch(Plane.XY, mode=Mode.PRIVATE) as heat_set_insert_cut_direction_2_sk2:
        with Locations(Location((15, 2.884785525, 0), (0, 0, 180))):
            Circle(SKETCH12_R)
    heat_set_insert_cut_direction_2_tool2 = split(extrude(heat_set_insert_cut_direction_2_sk2.sketch, amount=HEAT_SET_INSERT_CUT_DIRECTION_2_REACH, mode=Mode.PRIVATE), bisect_by=heat_set_insert_cut_direction_2_end, keep=Keep.BOTH, mode=Mode.PRIVATE)
    add(heat_set_insert_cut_direction_2_tool1.solids().sort_by(Axis((54.027171, 2.884786, 0), (0, 0, 1)))[0], mode=Mode.SUBTRACT)
    add(heat_set_insert_cut_direction_2_tool2.solids().sort_by(Axis((15, 2.884786, 0), (0, 0, 1)))[0], mode=Mode.SUBTRACT)

    # Sketch14 → Panel Heat Set Insert Cut (cut)
    with BuildSketch(Plane.XY.offset(65)):
        with Locations((-62.379754231, 90.491593885)):
            Circle(SKETCH14_R)
        with Locations((62.379754231, 90.491593885)):
            Circle(SKETCH14_R)
        with Locations((62.379754231, -13.292799065)):
            Circle(SKETCH14_R)
        with Locations((-62.379754231, -13.292799065)):
            Circle(SKETCH14_R)
    extrude(amount=-PANEL_HEAT_SET_INSERT_CUT_DEPTH, mode=Mode.SUBTRACT)

    # Sketch16 → Boss-Extrude10 (add)
    with BuildSketch(Plane.ZY.offset(67.5)):
        with Locations((3.5, -18.213532665)):
            Rectangle(SKETCH16_W, SKETCH16_H)
        with Locations((56.5, -18.213532665)):
            Rectangle(SKETCH16_W, SKETCH16_H)
    extrude(amount=BOSS_EXTRUDE10_DEPTH)

    # Sketch18 → Boss-Extrude11 (add)
    with BuildSketch(Plane(origin=(67.5, 0, 0), x_dir=(0, 0, -1), z_dir=(1, 0, 0))):
        with Locations((-56.5, -18.25)):
            Rectangle(SKETCH18_W, SKETCH18_H)
    extrude(amount=BOSS_EXTRUDE11_DEPTH)

    # Sketch19 → Cut-Extrude1 (cut, through all)
    with BuildSketch(Plane(origin=(0, -16.42706533, 0), x_dir=(1, 0, 0), z_dir=(0, 1, 0))):
        with Locations(Location((-72.5, -56.5, 0), (0, 0, 180))):
            Circle(SKETCH19_R)
        with Locations(Location((-72.5, -3.5, 0), (0, 0, 180))):
            Circle(SKETCH19_R)
        with Locations(Location((72.5, -56.5, 0), (0, 0, 180))):
            Circle(SKETCH19_R)
    extrude(amount=-CUT_EXTRUDE1_DEPTH, mode=Mode.SUBTRACT)


solid = part.part
